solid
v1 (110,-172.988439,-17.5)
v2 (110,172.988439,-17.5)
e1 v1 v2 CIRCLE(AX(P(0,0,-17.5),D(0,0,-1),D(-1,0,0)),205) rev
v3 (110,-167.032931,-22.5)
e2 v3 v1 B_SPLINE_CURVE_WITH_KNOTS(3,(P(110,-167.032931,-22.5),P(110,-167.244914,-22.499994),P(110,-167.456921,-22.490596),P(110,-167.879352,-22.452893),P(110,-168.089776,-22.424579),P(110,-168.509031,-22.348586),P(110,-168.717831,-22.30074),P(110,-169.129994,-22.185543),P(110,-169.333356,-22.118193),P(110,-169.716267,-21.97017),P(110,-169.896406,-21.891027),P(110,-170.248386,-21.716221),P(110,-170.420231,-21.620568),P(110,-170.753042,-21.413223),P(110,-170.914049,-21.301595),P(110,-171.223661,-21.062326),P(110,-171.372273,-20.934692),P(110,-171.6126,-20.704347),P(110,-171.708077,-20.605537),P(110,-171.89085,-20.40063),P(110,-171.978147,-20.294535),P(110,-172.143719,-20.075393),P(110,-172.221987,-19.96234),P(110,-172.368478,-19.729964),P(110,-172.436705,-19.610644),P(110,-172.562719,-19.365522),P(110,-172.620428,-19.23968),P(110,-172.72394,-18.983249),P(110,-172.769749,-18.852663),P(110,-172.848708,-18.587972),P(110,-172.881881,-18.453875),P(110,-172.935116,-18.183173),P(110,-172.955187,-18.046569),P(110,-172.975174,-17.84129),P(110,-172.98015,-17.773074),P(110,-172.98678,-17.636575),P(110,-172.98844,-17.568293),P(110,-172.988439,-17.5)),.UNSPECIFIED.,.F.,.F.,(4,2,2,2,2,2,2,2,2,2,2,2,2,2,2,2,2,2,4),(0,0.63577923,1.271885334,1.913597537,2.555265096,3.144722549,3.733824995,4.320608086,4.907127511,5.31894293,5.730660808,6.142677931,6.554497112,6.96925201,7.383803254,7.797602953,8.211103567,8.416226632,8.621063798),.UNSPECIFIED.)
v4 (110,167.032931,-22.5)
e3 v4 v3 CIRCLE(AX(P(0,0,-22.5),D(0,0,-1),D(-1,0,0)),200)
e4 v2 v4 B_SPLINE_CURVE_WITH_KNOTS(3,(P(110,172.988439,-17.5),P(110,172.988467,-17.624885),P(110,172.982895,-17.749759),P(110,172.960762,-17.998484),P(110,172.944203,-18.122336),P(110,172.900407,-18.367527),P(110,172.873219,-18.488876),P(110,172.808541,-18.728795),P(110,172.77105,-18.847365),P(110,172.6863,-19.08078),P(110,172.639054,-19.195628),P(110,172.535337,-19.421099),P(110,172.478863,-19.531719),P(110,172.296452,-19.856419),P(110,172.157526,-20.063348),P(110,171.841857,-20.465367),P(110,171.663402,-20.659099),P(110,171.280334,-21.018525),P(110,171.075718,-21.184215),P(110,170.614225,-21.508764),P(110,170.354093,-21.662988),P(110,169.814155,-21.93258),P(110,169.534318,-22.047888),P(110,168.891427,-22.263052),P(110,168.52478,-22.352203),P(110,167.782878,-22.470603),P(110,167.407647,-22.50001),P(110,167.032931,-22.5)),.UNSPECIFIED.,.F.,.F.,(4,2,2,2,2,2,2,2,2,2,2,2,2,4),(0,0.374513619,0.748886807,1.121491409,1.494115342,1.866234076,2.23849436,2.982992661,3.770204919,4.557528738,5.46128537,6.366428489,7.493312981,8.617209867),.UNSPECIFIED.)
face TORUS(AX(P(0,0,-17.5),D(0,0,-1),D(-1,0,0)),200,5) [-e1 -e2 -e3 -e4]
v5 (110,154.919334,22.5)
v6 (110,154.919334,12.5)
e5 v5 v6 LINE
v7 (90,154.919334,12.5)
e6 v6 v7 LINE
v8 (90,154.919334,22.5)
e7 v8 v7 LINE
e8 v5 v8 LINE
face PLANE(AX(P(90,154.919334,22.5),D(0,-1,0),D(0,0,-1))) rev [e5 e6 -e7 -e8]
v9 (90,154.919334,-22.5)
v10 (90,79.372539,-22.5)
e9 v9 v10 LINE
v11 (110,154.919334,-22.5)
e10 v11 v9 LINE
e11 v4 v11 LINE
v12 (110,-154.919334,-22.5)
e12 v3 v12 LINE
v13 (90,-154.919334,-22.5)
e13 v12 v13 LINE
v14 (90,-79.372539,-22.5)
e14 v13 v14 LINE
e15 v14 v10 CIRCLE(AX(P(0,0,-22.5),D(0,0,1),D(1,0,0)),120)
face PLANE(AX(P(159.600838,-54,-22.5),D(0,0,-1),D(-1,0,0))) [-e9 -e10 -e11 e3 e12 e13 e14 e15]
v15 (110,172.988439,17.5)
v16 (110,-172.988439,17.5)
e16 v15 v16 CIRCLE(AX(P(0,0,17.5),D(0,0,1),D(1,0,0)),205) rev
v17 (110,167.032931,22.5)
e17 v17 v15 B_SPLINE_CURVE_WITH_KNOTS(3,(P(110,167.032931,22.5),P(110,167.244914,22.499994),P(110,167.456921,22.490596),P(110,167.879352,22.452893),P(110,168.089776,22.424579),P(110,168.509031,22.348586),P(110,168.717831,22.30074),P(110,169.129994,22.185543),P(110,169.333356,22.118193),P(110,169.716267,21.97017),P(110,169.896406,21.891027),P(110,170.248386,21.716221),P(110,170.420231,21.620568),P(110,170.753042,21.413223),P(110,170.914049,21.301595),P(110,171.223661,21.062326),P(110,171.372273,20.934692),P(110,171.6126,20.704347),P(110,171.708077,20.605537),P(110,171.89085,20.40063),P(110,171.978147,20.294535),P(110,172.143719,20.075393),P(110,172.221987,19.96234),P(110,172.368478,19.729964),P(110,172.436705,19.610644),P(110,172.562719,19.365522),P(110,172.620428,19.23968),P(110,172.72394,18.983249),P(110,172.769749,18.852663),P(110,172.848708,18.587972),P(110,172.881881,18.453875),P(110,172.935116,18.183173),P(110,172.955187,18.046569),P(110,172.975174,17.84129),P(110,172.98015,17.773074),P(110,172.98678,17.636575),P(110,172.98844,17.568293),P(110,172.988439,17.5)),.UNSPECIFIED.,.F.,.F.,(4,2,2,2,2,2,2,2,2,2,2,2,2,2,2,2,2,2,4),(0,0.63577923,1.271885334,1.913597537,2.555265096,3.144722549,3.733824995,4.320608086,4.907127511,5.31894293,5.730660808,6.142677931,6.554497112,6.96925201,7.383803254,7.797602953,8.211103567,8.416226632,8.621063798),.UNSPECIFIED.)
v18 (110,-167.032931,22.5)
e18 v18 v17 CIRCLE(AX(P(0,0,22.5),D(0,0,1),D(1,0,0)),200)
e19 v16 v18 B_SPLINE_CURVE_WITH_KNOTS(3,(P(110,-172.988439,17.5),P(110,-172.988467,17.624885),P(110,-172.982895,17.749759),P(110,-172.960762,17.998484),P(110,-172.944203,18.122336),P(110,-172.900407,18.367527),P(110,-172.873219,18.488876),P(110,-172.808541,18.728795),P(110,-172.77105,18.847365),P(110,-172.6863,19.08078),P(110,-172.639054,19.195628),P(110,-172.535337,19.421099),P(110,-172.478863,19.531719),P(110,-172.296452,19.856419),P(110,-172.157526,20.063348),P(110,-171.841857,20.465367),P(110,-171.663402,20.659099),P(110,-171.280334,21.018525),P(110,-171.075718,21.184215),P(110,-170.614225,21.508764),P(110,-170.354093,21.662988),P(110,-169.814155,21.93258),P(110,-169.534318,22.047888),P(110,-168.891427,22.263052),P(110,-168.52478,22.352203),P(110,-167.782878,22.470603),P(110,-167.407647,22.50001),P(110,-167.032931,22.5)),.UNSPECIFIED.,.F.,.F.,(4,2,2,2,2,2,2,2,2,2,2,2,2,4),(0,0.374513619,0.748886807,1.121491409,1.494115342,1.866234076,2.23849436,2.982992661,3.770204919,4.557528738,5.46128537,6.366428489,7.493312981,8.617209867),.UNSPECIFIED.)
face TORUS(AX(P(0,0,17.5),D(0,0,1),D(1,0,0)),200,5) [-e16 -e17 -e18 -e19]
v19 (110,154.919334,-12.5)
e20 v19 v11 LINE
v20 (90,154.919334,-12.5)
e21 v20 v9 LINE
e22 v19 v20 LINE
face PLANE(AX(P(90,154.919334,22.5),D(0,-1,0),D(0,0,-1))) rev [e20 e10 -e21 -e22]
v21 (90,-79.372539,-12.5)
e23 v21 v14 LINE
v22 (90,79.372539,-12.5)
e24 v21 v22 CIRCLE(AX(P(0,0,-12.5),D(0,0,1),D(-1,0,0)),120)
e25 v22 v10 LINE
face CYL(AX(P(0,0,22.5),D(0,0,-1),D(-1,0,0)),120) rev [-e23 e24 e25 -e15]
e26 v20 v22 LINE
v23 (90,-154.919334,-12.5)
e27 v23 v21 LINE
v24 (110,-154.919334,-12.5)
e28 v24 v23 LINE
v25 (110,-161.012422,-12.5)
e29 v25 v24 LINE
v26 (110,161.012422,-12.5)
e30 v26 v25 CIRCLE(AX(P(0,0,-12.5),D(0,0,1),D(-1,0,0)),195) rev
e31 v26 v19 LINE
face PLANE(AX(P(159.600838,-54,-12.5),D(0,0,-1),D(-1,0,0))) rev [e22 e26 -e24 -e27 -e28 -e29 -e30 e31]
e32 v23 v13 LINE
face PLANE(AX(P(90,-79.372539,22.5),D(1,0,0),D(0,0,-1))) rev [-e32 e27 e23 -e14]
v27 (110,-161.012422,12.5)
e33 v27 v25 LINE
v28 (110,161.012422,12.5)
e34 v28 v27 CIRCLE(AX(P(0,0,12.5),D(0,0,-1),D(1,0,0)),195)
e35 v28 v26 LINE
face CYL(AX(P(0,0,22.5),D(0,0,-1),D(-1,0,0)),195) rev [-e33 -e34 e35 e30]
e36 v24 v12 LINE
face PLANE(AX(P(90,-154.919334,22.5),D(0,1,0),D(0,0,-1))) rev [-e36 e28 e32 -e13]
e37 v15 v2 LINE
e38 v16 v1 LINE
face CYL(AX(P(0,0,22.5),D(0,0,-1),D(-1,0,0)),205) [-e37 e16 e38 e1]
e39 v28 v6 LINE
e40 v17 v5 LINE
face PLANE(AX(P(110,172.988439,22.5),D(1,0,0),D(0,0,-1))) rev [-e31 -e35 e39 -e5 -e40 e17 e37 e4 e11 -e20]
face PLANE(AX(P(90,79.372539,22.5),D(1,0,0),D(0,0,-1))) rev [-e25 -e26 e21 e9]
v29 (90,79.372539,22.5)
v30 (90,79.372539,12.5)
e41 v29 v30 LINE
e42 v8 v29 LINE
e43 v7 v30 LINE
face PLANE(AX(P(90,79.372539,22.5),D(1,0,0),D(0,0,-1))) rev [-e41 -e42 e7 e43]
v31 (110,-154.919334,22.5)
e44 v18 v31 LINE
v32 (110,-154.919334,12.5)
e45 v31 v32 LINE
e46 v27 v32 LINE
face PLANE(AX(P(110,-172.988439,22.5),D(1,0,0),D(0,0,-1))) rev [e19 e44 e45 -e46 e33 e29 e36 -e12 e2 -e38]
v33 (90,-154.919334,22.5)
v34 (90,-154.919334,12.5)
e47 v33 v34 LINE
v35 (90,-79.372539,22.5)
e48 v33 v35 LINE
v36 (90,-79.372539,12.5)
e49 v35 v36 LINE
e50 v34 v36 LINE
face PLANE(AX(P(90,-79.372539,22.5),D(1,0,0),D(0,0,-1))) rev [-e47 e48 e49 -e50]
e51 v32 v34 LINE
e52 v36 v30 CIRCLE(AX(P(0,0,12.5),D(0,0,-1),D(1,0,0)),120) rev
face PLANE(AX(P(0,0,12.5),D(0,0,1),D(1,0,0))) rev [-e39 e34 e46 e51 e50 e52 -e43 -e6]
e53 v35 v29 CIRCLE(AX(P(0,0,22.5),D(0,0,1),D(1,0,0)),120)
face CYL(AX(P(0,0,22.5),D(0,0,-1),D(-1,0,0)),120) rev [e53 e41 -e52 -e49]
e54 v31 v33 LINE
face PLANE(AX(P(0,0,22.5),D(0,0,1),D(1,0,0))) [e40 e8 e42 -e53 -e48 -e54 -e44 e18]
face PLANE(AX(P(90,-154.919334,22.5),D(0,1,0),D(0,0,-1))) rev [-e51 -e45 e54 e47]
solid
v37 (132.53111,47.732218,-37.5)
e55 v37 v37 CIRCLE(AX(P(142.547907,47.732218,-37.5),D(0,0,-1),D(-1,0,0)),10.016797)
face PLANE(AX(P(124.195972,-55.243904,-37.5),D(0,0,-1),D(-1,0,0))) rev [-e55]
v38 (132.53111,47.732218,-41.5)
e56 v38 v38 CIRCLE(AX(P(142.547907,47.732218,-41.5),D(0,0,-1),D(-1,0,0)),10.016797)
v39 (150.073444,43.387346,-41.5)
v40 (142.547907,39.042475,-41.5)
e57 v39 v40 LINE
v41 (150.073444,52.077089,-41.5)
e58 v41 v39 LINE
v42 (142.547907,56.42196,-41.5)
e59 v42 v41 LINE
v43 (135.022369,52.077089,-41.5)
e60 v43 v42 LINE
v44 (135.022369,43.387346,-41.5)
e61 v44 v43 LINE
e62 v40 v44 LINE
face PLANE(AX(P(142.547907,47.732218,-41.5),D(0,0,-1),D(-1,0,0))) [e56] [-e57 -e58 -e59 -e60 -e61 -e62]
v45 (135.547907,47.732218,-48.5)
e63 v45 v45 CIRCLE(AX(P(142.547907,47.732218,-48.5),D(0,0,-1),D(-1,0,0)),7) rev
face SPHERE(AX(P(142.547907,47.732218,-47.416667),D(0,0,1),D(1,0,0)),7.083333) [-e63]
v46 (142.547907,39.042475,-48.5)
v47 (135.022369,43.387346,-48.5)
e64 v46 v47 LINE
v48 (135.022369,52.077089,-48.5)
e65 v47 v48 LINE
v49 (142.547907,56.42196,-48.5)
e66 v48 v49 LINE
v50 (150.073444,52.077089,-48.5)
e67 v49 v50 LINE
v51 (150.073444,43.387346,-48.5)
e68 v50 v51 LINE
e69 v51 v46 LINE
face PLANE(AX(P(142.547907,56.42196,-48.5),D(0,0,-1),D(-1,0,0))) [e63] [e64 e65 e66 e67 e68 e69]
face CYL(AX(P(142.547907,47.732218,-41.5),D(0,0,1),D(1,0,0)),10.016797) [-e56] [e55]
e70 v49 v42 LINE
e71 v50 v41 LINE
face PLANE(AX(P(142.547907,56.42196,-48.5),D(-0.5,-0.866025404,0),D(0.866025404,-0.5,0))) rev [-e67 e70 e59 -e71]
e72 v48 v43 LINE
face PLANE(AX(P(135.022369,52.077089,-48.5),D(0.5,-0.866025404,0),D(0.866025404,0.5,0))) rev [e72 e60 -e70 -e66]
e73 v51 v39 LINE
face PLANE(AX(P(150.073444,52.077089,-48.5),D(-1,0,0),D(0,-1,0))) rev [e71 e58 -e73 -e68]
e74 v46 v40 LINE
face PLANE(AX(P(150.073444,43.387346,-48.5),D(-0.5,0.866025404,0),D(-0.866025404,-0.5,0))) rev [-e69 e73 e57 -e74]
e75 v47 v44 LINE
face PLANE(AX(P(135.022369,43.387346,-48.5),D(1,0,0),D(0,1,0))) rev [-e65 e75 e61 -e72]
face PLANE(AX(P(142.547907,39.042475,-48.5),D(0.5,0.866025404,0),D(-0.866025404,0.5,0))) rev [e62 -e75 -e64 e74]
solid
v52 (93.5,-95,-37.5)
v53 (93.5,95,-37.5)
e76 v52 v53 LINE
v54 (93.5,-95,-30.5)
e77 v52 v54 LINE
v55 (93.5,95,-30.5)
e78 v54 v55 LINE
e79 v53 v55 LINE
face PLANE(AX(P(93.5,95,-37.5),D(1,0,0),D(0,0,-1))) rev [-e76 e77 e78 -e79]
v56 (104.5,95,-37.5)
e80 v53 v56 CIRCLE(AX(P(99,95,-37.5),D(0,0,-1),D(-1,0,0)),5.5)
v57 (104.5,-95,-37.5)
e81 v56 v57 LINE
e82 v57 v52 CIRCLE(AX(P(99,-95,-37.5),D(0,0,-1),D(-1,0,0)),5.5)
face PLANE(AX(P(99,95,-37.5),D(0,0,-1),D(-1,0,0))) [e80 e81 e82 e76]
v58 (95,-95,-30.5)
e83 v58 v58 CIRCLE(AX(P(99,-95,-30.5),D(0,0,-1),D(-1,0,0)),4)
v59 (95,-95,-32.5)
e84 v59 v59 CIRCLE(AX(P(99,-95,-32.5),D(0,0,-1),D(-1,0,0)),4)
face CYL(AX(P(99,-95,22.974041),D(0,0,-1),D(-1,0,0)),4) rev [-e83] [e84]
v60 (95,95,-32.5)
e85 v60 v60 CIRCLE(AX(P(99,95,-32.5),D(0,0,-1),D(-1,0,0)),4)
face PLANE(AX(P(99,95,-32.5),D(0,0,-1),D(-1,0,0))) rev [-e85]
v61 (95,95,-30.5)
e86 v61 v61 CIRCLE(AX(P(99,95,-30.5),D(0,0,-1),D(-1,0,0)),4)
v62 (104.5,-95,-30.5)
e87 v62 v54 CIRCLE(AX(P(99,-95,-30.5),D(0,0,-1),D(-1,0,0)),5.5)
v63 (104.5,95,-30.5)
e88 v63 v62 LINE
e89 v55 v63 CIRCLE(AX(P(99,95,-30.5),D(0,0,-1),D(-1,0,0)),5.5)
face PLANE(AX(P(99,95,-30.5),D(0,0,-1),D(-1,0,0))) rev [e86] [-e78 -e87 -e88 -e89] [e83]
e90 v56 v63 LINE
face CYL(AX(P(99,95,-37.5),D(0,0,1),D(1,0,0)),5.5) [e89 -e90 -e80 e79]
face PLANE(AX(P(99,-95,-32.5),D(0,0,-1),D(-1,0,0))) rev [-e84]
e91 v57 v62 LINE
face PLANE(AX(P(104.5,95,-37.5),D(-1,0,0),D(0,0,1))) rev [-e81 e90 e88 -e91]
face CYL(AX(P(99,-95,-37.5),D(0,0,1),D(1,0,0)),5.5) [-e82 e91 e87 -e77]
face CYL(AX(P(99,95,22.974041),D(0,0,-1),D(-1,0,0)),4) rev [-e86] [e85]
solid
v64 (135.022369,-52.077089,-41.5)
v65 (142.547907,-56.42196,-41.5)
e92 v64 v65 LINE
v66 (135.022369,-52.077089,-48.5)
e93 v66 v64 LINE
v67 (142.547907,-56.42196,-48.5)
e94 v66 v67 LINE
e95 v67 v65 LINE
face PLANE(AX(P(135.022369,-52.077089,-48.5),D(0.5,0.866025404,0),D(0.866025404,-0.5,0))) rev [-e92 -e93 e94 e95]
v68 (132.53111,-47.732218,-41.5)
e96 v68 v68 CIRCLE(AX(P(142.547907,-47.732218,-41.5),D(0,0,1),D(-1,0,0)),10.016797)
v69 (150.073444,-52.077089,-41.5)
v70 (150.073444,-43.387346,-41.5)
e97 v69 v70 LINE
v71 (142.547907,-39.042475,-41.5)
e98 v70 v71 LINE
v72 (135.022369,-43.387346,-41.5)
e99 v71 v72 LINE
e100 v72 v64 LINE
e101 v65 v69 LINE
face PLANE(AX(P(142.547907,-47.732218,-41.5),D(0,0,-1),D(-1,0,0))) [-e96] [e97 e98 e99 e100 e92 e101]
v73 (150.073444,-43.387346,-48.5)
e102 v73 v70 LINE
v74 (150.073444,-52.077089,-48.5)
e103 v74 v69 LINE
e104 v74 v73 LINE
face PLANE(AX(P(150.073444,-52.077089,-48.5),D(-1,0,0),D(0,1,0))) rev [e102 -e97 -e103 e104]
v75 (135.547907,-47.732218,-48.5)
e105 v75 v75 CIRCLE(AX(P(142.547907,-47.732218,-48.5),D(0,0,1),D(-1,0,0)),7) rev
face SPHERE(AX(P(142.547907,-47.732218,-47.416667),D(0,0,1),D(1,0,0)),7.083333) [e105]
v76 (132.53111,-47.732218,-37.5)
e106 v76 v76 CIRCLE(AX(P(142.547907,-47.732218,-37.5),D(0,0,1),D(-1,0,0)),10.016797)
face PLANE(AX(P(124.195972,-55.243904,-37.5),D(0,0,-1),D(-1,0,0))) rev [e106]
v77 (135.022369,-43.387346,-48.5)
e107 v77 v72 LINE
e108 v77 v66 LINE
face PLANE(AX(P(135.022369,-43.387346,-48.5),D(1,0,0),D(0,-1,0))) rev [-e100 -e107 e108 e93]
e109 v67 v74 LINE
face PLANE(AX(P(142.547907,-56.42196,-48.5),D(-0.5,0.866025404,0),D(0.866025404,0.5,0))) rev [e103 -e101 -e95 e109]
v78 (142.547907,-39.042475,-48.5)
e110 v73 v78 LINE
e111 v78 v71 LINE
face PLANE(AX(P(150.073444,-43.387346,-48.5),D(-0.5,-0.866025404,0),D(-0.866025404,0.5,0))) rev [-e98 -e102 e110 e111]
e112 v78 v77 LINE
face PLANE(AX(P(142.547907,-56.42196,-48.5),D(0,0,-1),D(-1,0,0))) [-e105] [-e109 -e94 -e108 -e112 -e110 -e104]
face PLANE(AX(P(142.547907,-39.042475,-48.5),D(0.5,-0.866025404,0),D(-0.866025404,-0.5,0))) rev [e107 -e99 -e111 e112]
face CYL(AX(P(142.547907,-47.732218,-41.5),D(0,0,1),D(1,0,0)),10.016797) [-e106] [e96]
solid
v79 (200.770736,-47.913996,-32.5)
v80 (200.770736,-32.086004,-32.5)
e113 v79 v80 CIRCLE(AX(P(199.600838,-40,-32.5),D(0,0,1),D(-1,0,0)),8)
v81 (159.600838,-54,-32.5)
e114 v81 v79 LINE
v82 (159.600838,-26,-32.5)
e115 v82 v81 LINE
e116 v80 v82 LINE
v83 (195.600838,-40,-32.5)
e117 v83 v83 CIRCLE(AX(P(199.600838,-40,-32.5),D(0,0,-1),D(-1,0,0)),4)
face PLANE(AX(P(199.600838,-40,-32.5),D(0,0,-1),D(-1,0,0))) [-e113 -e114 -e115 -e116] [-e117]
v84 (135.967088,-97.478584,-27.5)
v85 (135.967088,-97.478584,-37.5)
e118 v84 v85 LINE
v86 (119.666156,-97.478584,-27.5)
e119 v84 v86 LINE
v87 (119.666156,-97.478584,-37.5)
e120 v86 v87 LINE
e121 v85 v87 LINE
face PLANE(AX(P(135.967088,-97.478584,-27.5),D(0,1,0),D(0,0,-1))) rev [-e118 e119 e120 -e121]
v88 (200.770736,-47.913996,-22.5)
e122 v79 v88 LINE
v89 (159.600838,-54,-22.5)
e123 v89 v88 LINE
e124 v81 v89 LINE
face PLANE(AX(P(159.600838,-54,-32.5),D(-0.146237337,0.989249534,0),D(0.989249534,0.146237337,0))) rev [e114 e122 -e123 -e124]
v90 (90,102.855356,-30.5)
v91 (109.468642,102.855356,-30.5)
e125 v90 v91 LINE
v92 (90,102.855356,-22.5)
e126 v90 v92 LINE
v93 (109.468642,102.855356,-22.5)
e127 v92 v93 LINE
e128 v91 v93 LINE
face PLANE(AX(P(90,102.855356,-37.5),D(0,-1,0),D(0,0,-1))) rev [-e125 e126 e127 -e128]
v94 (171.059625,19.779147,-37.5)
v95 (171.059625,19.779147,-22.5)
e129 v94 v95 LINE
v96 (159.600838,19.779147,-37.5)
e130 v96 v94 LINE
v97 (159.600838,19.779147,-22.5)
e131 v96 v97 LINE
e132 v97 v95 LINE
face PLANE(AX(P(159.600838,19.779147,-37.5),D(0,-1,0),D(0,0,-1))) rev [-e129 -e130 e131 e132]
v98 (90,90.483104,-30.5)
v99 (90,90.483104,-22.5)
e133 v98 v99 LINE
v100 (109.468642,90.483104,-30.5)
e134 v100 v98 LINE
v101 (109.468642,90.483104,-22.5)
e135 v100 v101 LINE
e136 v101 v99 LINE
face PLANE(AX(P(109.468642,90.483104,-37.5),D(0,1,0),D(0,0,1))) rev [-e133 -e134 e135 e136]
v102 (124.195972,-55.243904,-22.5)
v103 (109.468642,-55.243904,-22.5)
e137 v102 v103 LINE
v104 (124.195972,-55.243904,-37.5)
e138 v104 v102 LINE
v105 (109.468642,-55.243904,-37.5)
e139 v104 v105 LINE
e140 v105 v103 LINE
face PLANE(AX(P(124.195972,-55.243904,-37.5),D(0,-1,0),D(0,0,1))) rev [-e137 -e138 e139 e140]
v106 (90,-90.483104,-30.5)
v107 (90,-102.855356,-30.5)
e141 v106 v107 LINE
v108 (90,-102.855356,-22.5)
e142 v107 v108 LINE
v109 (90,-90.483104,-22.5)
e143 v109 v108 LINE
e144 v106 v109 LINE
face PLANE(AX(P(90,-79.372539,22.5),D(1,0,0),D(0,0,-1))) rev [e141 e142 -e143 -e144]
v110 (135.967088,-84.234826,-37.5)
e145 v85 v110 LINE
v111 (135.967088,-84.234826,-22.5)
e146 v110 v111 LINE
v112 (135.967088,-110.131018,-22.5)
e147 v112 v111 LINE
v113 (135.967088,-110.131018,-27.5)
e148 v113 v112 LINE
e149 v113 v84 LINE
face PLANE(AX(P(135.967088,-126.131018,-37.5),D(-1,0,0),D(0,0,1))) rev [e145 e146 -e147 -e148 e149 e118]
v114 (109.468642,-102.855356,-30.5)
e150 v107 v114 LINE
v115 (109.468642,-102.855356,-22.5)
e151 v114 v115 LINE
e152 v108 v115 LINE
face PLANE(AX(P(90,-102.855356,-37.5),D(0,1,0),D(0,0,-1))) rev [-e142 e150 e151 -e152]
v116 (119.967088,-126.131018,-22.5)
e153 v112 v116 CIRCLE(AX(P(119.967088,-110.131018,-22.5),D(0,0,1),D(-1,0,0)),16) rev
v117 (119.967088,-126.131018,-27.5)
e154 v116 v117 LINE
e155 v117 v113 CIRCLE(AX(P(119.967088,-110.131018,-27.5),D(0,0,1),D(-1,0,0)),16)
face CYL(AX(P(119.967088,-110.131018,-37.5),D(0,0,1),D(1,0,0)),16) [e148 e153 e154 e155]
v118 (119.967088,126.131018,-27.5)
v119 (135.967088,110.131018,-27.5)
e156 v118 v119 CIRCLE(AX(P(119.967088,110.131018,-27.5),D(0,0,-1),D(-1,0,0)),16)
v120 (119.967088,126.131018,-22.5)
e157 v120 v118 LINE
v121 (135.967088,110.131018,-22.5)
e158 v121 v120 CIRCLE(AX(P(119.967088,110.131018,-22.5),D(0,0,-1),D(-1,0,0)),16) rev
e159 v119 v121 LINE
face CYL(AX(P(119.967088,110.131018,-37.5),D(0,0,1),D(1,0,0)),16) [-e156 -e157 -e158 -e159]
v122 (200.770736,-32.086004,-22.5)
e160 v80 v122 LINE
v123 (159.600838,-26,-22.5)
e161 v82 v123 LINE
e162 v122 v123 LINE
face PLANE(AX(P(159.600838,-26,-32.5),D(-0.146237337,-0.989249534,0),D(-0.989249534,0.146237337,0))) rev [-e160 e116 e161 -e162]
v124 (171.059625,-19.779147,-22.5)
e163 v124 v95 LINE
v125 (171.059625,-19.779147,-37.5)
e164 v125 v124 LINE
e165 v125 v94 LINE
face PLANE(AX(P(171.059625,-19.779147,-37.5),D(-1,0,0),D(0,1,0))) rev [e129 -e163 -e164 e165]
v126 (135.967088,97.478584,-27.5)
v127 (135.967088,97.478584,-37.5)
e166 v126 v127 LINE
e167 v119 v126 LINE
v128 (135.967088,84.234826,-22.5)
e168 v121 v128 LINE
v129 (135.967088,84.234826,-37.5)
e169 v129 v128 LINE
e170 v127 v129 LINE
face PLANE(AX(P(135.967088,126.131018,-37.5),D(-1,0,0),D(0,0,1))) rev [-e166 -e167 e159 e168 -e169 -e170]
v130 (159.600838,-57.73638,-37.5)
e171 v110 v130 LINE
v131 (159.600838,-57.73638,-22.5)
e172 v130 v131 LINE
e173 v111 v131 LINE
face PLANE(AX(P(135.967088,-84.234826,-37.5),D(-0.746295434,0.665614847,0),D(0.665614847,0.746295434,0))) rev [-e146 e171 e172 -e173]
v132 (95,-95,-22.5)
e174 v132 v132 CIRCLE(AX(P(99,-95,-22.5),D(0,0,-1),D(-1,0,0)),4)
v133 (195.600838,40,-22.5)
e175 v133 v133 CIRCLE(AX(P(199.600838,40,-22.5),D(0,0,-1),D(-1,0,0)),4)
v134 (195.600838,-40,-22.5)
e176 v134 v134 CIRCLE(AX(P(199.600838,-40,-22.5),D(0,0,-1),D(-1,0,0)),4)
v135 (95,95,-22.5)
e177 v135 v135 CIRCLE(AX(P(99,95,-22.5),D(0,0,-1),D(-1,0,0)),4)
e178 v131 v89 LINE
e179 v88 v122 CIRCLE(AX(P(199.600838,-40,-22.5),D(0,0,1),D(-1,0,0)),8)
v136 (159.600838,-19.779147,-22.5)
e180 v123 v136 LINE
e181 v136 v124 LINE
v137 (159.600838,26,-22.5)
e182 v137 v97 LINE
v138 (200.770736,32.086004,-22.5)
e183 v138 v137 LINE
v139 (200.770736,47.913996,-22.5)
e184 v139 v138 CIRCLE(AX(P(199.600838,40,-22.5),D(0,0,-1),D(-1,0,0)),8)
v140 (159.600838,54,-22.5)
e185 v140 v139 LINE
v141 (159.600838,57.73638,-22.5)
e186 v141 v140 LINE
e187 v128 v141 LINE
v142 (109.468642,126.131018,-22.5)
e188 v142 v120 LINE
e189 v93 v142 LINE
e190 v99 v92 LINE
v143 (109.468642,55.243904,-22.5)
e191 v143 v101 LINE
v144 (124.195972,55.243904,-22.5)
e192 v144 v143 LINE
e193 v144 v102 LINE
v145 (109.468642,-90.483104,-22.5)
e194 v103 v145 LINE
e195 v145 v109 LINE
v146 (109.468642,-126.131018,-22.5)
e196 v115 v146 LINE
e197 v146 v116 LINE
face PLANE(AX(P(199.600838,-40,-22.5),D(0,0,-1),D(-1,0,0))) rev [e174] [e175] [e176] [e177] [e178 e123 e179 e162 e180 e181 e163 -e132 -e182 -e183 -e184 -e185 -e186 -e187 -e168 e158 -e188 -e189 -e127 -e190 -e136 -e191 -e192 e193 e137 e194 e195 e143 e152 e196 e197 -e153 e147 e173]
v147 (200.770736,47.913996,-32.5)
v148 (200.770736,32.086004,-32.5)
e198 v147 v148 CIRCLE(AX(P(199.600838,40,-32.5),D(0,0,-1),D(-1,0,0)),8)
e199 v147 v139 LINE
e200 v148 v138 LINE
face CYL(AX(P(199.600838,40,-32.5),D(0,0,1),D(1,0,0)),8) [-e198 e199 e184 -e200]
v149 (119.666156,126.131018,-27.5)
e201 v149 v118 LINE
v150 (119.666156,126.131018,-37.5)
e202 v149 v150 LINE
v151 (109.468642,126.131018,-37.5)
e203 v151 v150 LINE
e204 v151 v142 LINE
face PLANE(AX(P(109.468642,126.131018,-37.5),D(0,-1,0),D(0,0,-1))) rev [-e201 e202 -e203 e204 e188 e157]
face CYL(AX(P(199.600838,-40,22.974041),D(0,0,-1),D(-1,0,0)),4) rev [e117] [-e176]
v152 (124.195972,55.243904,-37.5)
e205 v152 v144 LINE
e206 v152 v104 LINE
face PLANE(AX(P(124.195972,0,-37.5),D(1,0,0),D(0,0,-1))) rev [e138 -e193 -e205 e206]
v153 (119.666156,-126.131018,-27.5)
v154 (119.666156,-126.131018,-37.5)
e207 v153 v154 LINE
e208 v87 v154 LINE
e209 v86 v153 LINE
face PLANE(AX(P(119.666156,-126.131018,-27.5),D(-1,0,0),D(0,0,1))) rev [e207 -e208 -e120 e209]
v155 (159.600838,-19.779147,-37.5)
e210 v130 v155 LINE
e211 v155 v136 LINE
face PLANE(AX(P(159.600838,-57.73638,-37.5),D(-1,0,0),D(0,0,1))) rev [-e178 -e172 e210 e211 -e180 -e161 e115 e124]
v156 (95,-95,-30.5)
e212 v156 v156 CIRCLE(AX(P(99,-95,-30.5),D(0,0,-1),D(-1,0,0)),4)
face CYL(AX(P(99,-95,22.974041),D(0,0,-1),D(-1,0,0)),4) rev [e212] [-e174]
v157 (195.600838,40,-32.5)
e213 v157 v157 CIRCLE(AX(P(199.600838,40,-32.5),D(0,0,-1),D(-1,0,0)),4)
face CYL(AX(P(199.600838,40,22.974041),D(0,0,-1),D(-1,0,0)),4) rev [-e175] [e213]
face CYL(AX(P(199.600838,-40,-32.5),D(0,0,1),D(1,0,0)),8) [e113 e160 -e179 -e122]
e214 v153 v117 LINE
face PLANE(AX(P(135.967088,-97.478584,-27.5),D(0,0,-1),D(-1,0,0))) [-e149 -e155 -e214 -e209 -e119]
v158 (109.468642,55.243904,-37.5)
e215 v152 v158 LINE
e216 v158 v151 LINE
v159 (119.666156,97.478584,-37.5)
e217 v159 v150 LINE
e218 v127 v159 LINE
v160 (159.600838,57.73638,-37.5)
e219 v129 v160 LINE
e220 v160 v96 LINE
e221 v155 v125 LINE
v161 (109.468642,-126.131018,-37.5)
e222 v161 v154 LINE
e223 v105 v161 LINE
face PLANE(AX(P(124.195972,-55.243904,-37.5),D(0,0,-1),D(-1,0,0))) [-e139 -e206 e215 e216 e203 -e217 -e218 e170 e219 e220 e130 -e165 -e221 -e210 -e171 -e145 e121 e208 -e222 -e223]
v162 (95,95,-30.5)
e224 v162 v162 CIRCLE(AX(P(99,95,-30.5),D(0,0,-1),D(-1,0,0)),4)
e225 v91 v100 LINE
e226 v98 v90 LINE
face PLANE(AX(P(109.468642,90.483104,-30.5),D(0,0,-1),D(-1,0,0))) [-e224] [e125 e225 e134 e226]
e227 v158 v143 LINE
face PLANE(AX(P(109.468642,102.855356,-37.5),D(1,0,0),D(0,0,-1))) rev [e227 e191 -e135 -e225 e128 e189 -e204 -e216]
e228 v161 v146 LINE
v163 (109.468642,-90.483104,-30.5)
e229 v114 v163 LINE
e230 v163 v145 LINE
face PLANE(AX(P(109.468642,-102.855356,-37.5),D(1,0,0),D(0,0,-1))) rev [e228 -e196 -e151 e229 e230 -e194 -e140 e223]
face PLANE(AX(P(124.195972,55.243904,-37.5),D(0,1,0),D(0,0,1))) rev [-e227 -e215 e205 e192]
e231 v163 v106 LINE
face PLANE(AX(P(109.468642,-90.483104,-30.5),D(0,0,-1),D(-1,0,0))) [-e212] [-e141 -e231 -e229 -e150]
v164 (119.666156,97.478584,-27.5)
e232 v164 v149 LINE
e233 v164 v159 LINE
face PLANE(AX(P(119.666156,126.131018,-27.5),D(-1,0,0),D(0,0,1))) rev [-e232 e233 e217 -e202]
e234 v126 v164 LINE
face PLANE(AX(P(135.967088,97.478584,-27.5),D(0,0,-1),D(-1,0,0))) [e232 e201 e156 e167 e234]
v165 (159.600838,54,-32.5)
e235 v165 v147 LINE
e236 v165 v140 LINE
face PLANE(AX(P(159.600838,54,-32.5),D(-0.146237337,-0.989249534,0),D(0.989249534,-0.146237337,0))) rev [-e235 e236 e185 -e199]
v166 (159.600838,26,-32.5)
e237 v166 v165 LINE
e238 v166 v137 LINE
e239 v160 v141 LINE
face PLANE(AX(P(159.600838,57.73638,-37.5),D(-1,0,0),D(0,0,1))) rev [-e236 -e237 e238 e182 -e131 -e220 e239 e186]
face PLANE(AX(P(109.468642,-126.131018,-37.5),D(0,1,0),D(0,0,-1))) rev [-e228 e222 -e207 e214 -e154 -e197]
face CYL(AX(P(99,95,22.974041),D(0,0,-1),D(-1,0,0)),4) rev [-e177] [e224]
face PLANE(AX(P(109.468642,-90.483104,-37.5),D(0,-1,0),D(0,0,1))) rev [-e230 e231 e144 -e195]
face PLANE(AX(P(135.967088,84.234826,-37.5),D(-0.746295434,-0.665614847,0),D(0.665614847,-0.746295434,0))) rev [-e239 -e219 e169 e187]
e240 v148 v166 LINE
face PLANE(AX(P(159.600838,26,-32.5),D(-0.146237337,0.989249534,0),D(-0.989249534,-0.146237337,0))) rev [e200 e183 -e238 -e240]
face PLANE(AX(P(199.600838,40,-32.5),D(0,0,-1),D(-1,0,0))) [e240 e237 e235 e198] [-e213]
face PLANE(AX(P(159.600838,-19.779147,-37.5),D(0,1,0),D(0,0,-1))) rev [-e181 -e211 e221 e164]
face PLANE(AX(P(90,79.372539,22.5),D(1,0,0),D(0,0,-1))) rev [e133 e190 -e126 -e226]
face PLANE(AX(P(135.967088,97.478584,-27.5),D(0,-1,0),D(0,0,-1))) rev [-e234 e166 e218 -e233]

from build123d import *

# Parameters (mm, degrees)
BOSS_EXTRUDE1_DEPTH  = 22.5
BOSS_EXTRUDE11_DEPTH = 15.000000000000007
BOSS_EXTRUDE12_DEPTH = 10.000000000000002
SKETCH17_W           = 16.30093206343537
SKETCH17_H           = 28.65243434652365
CUT_EXTRUDE3_DEPTH   = 10.000000000000002
SKETCH18_R           = 10.016796709236138
BOSS_EXTRUDE13_DEPTH = 4
BOSS_EXTRUDE14_DEPTH = 7
SKETCH20_W           = 19.468642499915788
SKETCH20_H           = 12.372252056489486
CUT_EXTRUDE4_DEPTH   = 7
SHELL1_T             = -10
FILLET2_R            = 16
BOSS_EXTRUDE16_DEPTH = 7
FILLET5_R            = 5
SKETCH27_R           = 3.9999999999999933
SKETCH27_R_2         = 4.000000000000007
CUT_EXTRUDE6_DEPTH   = 276.7682139586702
SPLIT2_START         = -37.5
SPLIT2_DEPTH         = 15
SPLIT2_START_2       = -32.5
SPLIT2_2_OUTLINE_R   = 4
SPLIT2_2_DEPTH       = 10
SPLIT2_START_3       = -27.5
SPLIT2_3_OUTLINE_W   = 19.4686425
SPLIT2_3_OUTLINE_H   = 12.372252056000008
SPLIT2_3_OUTLINE_R   = 4
SPLIT2_3_DEPTH       = 5
SPLIT2_START_4       = -30.5
SPLIT2_4_OUTLINE_W   = 19.4686425
SPLIT2_4_OUTLINE_H   = 12.372252056000008
SPLIT2_4_OUTLINE_R   = 4
SPLIT2_4_DEPTH       = 3
SPLIT2_5_OUTLINE_R   = 4
SPLIT2_5_DEPTH       = 15
SPLIT2_START_5       = -55
SPLIT2_6_OUTLINE_R   = 10.016796709
SPLIT2_6_DEPTH       = 17.5
SPLIT2_START_6       = -48.5
SPLIT2_7_DEPTH       = 11
SPLIT2_START_7       = -41.5
SPLIT2_8_OUTLINE_R   = 10.016796709
SPLIT2_8_DEPTH       = 4


with BuildPart() as part:
    # Sketch2 → Boss-Extrude1 (new, symmetric)
    with BuildSketch(Plane.XY):
        with BuildLine():
            Line((120, 0), (205.00000000000003, 0))
            ThreePointArc((205.00000000000003, 0), (179.6872282606641, 98.67877177995278), (109.99999999999999, 172.98843892006195))
            Line((109.99999999999999, 172.98843892006195), (109.99999999999999, 154.91933384829673))
            Line((109.99999999999999, 154.91933384829673), (90, 154.91933384829673))
            Line((90, 154.91933384829673), (90, 79.37253933193772))
            ThreePointArc((90, 79.37253933193772), (112.24972160321823, 42.426406871192846), (120, 0))
        make_face()
    extrude(amount=BOSS_EXTRUDE1_DEPTH, both=True)

    # Sketch15 → Boss-Extrude11 (add)
    with BuildSketch(Plane(origin=(0, 0, -22.5), x_dir=(-1, 0, 0), z_dir=(0, 0, -1))):
        Polygon((-90, 102.85535609908183), (-109.46864249991577, 102.85535609908183), (-109.46864249991577, 126.1310181234055), (-135.96708849683807, 126.1310181234055), (-135.96708849683807, 84.23482647962292), (-159.60083762922824, 57.736380482700625), (-159.60083762922824, 19.77914702764976), (-171.0596250873568, 19.77914702764976), (-171.05962508735678, -1.73e-15), (-124.19597171575583, 0), (-124.19597171575583, 55.24390413047252), (-109.46864249991577, 55.24390413047252), (-109.46864249991577, 90.48310404259234), (-90, 90.48310404259234), align=None)
    extrude(amount=BOSS_EXTRUDE11_DEPTH)

    # Sketch16 → Boss-Extrude12 (add)
    with BuildSketch(Plane(origin=(0, 0, -22.5), x_dir=(-1, 0, 0), z_dir=(0, 0, -1))):
        with BuildLine():
            Line((-159.60083762922824, 26.000000000000004), (-200.770736325474, 32.08600372501209))
            ThreePointArc((-200.770736325474, 32.08600372501209), (-207.60083762922824, 39.99999999999999), (-200.770736325474, 47.913996274987895))
            Line((-200.770736325474, 47.913996274987895), (-159.60083762922824, 54))
            Line((-159.60083762922824, 54), (-159.60083762922824, 26.000000000000004))
        make_face()
    extrude(amount=BOSS_EXTRUDE12_DEPTH)

    # Sketch17 → Cut-Extrude3 (cut)
    with BuildSketch(Plane(origin=(0, 0, -37.50000000000001), x_dir=(-1, 0, 0), z_dir=(0, 0, -1))):
        with Locations((-127.81662246512039, 111.80480095014369)):
            Rectangle(SKETCH17_W, SKETCH17_H)
    extrude(amount=-CUT_EXTRUDE3_DEPTH, mode=Mode.SUBTRACT)

    # Sketch18 → Boss-Extrude13 (add)
    with BuildSketch(Plane(origin=(0, 0, -37.50000000000001), x_dir=(-1, 0, 0), z_dir=(0, 0, -1))):
        with Locations((-142.54790687329097, 47.73221762561834)):
            Circle(SKETCH18_R)
    extrude(amount=BOSS_EXTRUDE13_DEPTH)

    # Sketch19 → Boss-Extrude14 (add)
    with BuildSketch(Plane(origin=(0, 0, -41.50000000000001), x_dir=(-1, 0, 0), z_dir=(0, 0, -1))):
        Polygon((-142.54790687329097, 56.421959954505496), (-150.0734444824482, 52.0770887900619), (-150.07344448244817, 43.38734646117473), (-142.5479068732909, 39.04247529673119), (-135.0223692641337, 43.387346461174836), (-135.0223692641338, 52.07708879006201), align=None)
    extrude(amount=BOSS_EXTRUDE14_DEPTH)

    # Dome2: read off the stored shape, not the designer's step
    # Dome2 outline → Dome2 (revolve)
    with BuildSketch(Plane(origin=(142.547906873, 47.732217626, 0), x_dir=(1, 0, 0), z_dir=(0, -1, 0))):
        with BuildLine():
            Line((0, -48.499999993), (0, -54.5))
            ThreePointArc((0, -54.5), (4.609772231, -52.794734264), (7.000000001, -48.499999993))
            Line((7.000000001, -48.499999993), (0, -48.499999993))
        make_face()
    revolve(axis=Axis((142.547906873, 47.732217626, 0), (0, 0, 1)))

    # Sketch20 → Cut-Extrude4 (cut)
    with BuildSketch(Plane(origin=(0, 0, -37.50000000000001), x_dir=(-1, 0, 0), z_dir=(0, 0, -1))):
        with Locations((-99.7343212499579, 96.66923007083709)):
            Rectangle(SKETCH20_W, SKETCH20_H)
    extrude(amount=-CUT_EXTRUDE4_DEPTH, mode=Mode.SUBTRACT)


with BuildPart() as body_2:
    # Split1: read off the stored shape, not the designer's step
    # Split1: the piece on the far side of the plane
    add(part.part)
    split(bisect_by=Plane.XY.offset(-22.5), keep=Keep.BOTTOM)

    # Fillet2
    fillet2_edges = [body_2.edges().sort_by_distance(p)[0] for p in [
        (135.96708849683807, 126.1310181234055, -25.000000000000004),
    ]]
    fillet(fillet2_edges, radius=FILLET2_R)


with BuildPart() as part_1:
    add(part.part)

    # Split1
    split(bisect_by=Plane.XY.offset(-22.5), keep=Keep.TOP)

    # Shell1
    shell1_openings = [part_1.faces().sort_by_distance(p)[0] for p in [
        (90, 117.14593659, 0),
        (112.249721603, 42.426406871, 0),
        (162.5, 0, 0),
        (110, 163.953886384, 0),
        (100, 154.919333848, 0),
    ]]
    offset(amount=SHELL1_T, openings=shell1_openings)


with BuildPart() as body_3:
    # Mirror2: mirrored copy
    add(part_1.part.mirror(Plane(origin=(120, 0, 22.5), x_dir=(0, 0, 1), z_dir=(0, 1, 0))))

    # Combine2: union part
    add(part_1.part)

    # Fillet5
    fillet5_edges = [body_3.edges().sort_by_distance(p)[0] for p in [
        (205, -3.55e-15, -22.5),
        (205, -3.55e-15, 22.5),
    ]]
    fillet(fillet5_edges, radius=FILLET5_R)


with BuildPart() as body_4:
    # Mirror2 2: mirrored copy
    add(body_2.part.mirror(Plane(origin=(120, 0, 22.5), x_dir=(0, 0, 1), z_dir=(0, 1, 0))))

    # Combine1: union body 2
    add(body_2.part)


with BuildPart() as body_4_2:
    # Sketch23 → Boss-Extrude16 (new body)
    with BuildSketch(Plane(origin=(0, 0, -30.500000000000007), x_dir=(-1, 0, 0), z_dir=(0, 0, -1))):
        with BuildLine():
            Line((-93.49999999999997, 95), (-93.49999999999997, -95))
            ThreePointArc((-93.49999999999997, -95), (-98.99999999999996, -100.50000000000001), (-104.49999999999997, -95))
            Line((-104.49999999999997, -95), (-104.49999999999997, 95))
            ThreePointArc((-104.49999999999997, 95), (-98.99999999999996, 100.49999999999999), (-93.49999999999997, 95))
        make_face()
    extrude(amount=BOSS_EXTRUDE16_DEPTH)


with BuildPart() as cut_extrude6_tool:
    # Sketch27 → Cut-Extrude6 (new, through all)
    with BuildSketch(Plane(origin=(0, 0, -32.5), x_dir=(-1, 0, 0), z_dir=(0, 0, -1))):
        with Locations((-199.60083762922824, 39.99999999999999)):
            Circle(SKETCH27_R)
        with Locations((-199.60083762922824, -39.99999999999999)):
            Circle(SKETCH27_R)
        with Locations((-98.99999999999996, 95)):
            Circle(SKETCH27_R_2)
        with Locations((-98.99999999999996, -95)):
            Circle(SKETCH27_R_2)
    extrude(amount=-CUT_EXTRUDE6_DEPTH)


with BuildPart() as body_4_1:
    add(body_4.part)

    # Cut-Extrude6: cut by cut_extrude6_tool
    add(cut_extrude6_tool.part, mode=Mode.SUBTRACT)

    # Split2 5 outline → Split2 5 (cut)
    with BuildSketch(Plane.XY.offset(SPLIT2_START)):
        with BuildLine():
            Line((109.4686425, -55.24390413), (109.4686425, -90.483104043))
            Line((109.4686425, -90.483104043), (90, -90.483104043))
            Line((90, -90.483104043), (90, -102.855356099))
            Line((90, -102.855356099), (109.4686425, -102.855356099))
            Line((109.4686425, -102.855356099), (109.4686425, -126.131018123))
            Line((109.4686425, -126.131018123), (119.967088497, -126.131018123))
            ThreePointArc((119.967088497, -126.131018123), (131.280796996, -121.444726622), (135.967088497, -110.131018123))
            Line((135.967088497, -110.131018123), (135.967088497, -84.23482648))
            Line((135.967088497, -84.23482648), (159.600837629, -57.736380483))
            Line((159.600837629, -57.736380483), (159.600837629, -54))
            Line((159.600837629, -54), (200.770736325, -47.913996275))
            ThreePointArc((200.770736325, -47.913996275), (207.600837629, -40), (200.770736325, -32.086003725))
            Line((200.770736325, -32.086003725), (159.600837629, -26))
            Line((159.600837629, -26), (159.600837629, -19.779147028))
            Line((159.600837629, -19.779147028), (171.059625087, -19.779147028))
            Line((171.059625087, -19.779147028), (171.059625087, 19.779147028))
            Line((171.059625087, 19.779147028), (159.600837629, 19.779147028))
            Line((159.600837629, 19.779147028), (159.600837629, 26))
            Line((159.600837629, 26), (200.770736325, 32.086003725))
            ThreePointArc((200.770736325, 32.086003725), (207.600837629, 40), (200.770736325, 47.913996275))
            Line((200.770736325, 47.913996275), (159.600837629, 54))
            Line((159.600837629, 54), (159.600837629, 57.736380483))
            Line((159.600837629, 57.736380483), (135.967088497, 84.23482648))
            Line((135.967088497, 84.23482648), (135.967088497, 110.131018123))
            ThreePointArc((135.967088497, 110.131018123), (131.280796996, 121.444726622), (119.967088497, 126.131018123))
            Line((119.967088497, 126.131018123), (109.4686425, 126.131018123))
            Line((109.4686425, 126.131018123), (109.4686425, 102.855356099))
            Line((109.4686425, 102.855356099), (90, 102.855356099))
            Line((90, 102.855356099), (90, 90.483104043))
            Line((90, 90.483104043), (109.4686425, 90.483104043))
            Line((109.4686425, 90.483104043), (109.4686425, 55.24390413))
            Line((109.4686425, 55.24390413), (124.195971716, 55.24390413))
            Line((124.195971716, 55.24390413), (124.195971716, -55.24390413))
            Line((124.195971716, -55.24390413), (109.4686425, -55.24390413))
        make_face()
        with Locations((99, -95)):
            Circle(SPLIT2_5_OUTLINE_R, mode=Mode.SUBTRACT)
        with Locations((99, 95)):
            Circle(SPLIT2_5_OUTLINE_R, mode=Mode.SUBTRACT)
        with Locations((199.600837629, 40)):
            Circle(SPLIT2_5_OUTLINE_R, mode=Mode.SUBTRACT)
        with Locations((199.600837629, -40)):
            Circle(SPLIT2_5_OUTLINE_R, mode=Mode.SUBTRACT)
    extrude(amount=SPLIT2_5_DEPTH, mode=Mode.SUBTRACT)

    # Split2 6 outline → Split2 6 (cut)
    with BuildSketch(Plane.XY.offset(SPLIT2_START_5)):
        with Locations((142.547906873, 47.732217626)):
            Circle(SPLIT2_6_OUTLINE_R)
    extrude(amount=SPLIT2_6_DEPTH, mode=Mode.SUBTRACT)


with BuildPart() as body_4_2_1:
    add(body_4_2.part)

    # Cut-Extrude6: cut by cut_extrude6_tool
    add(cut_extrude6_tool.part, mode=Mode.SUBTRACT)


with BuildPart() as body_4_3:
    # Split2: read off the stored shape, not the designer's step
    # Split2 outline → Split2 (new body)
    with BuildSketch(Plane.XY.offset(SPLIT2_START)):
        Polygon((109.4686425, -55.24390413), (109.4686425, -126.131018123), (119.666156433, -126.131018123), (119.666156433, -97.478583777), (135.967088497, -97.478583777), (135.967088497, -84.23482648), (159.600837629, -57.736380483), (159.600837629, -19.779147028), (171.059625087, -19.779147028), (171.059625087, 19.779147028), (159.600837629, 19.779147028), (159.600837629, 57.736380483), (135.967088497, 84.23482648), (135.967088497, 97.478583777), (119.666156433, 97.478583777), (119.666156433, 126.131018123), (109.4686425, 126.131018123), (109.4686425, 55.24390413), (124.195971716, 55.24390413), (124.195971716, -55.24390413), align=None)
    extrude(amount=SPLIT2_DEPTH)

    # Split2 2 outline → Split2 2 (add)
    # profile 1 of 2: a face of its own
    with BuildSketch(Plane.XY.offset(SPLIT2_START_2)):
        with BuildLine():
            Line((159.600837629, -26), (159.600837629, -54))
            Line((159.600837629, -54), (200.770736325, -47.913996275))
            ThreePointArc((200.770736325, -47.913996275), (207.600837629, -40), (200.770736325, -32.086003725))
            Line((200.770736325, -32.086003725), (159.600837629, -26))
        make_face()
        with Locations((199.600837629, -40)):
            Circle(SPLIT2_2_OUTLINE_R, mode=Mode.SUBTRACT)
    # profile 2 of 2: a face of its own
    with BuildSketch(Plane.XY.offset(SPLIT2_START_2)):
        with BuildLine():
            Line((159.600837629, 54), (159.600837629, 26))
            Line((159.600837629, 26), (200.770736325, 32.086003725))
            ThreePointArc((200.770736325, 32.086003725), (207.600837629, 40), (200.770736325, 47.913996275))
            Line((200.770736325, 47.913996275), (159.600837629, 54))
        make_face()
        with Locations((199.600837629, 40)):
            Circle(SPLIT2_2_OUTLINE_R, mode=Mode.SUBTRACT)
    extrude(amount=SPLIT2_2_DEPTH)

    # Split2 3 outline → Split2 3 (add)
    # profile 1 of 4: a face of its own
    with BuildSketch(Plane.XY.offset(SPLIT2_START_3)):
        with Locations((99.73432125, -96.669230071)):
            Rectangle(SPLIT2_3_OUTLINE_W, SPLIT2_3_OUTLINE_H)
        with Locations((99, -95)):
            Circle(SPLIT2_3_OUTLINE_R, mode=Mode.SUBTRACT)
    # profile 2 of 4: a face of its own
    with BuildSketch(Plane.XY.offset(SPLIT2_START_3)):
        with BuildLine():
            Line((119.666156433, -97.478583777), (119.666156433, -126.131018123))
            Line((119.666156433, -126.131018123), (119.967088497, -126.131018123))
            ThreePointArc((119.967088497, -126.131018123), (131.280796996, -121.444726622), (135.967088497, -110.131018123))
            Line((135.967088497, -110.131018123), (135.967088497, -97.478583777))
            Line((135.967088497, -97.478583777), (119.666156433, -97.478583777))
        make_face()
    # profile 3 of 4: a face of its own
    with BuildSketch(Plane.XY.offset(SPLIT2_START_3)):
        with Locations((99.73432125, 96.669230071)):
            Rectangle(SPLIT2_3_OUTLINE_W, SPLIT2_3_OUTLINE_H)
        with Locations((99, 95)):
            Circle(SPLIT2_3_OUTLINE_R, mode=Mode.SUBTRACT)
    # profile 4 of 4: a face of its own
    with BuildSketch(Plane.XY.offset(SPLIT2_START_3)):
        with BuildLine():
            Line((119.967088497, 126.131018123), (119.666156433, 126.131018123))
            Line((119.666156433, 126.131018123), (119.666156433, 97.478583777))
            Line((119.666156433, 97.478583777), (135.967088497, 97.478583777))
            Line((135.967088497, 97.478583777), (135.967088497, 110.131018123))
            ThreePointArc((135.967088497, 110.131018123), (131.280796996, 121.444726622), (119.967088497, 126.131018123))
        make_face()
    extrude(amount=SPLIT2_3_DEPTH)

    # Split2 4 outline → Split2 4 (add)
    # profile 1 of 2: a face of its own
    with BuildSketch(Plane.XY.offset(SPLIT2_START_4)):
        with Locations((99.73432125, -96.669230071)):
            Rectangle(SPLIT2_4_OUTLINE_W, SPLIT2_4_OUTLINE_H)
        with Locations((99, -95)):
            Circle(SPLIT2_4_OUTLINE_R, mode=Mode.SUBTRACT)
    # profile 2 of 2: a face of its own
    with BuildSketch(Plane.XY.offset(SPLIT2_START_4)):
        with Locations((99.73432125, 96.669230071)):
            Rectangle(SPLIT2_4_OUTLINE_W, SPLIT2_4_OUTLINE_H)
        with Locations((99, 95)):
            Circle(SPLIT2_4_OUTLINE_R, mode=Mode.SUBTRACT)
    extrude(amount=SPLIT2_4_DEPTH)


with BuildPart() as body_5:
    # Split2 7 outline → Split2 7 (new body)
    with BuildSketch(Plane.XY.offset(SPLIT2_START_6)):
        Polygon((150.073444482, 43.387346461), (150.073444482, 52.07708879), (142.547906873, 56.421959955), (135.022369264, 52.07708879), (135.022369264, 43.387346461), (142.547906873, 39.042475297), align=None)
    extrude(amount=SPLIT2_7_DEPTH)

    # Split2 8 outline → Split2 8 (add)
    with BuildSketch(Plane.XY.offset(SPLIT2_START_7)):
        with Locations((142.547906873, 47.732217626)):
            Circle(SPLIT2_8_OUTLINE_R)
        Polygon((142.547906873, 56.421959955), (150.073444482, 52.07708879), (150.073444482, 43.387346461), (142.547906873, 39.042475297), (135.022369264, 43.387346461), (135.022369264, 52.07708879), align=None, mode=Mode.SUBTRACT)
    extrude(amount=SPLIT2_8_DEPTH)

    # Split2 9 outline → Split2 9 (revolve)
    with BuildSketch(Plane(origin=(142.547906873, 47.732217626, 0), x_dir=(1, 0, 0), z_dir=(0, -1, 0))):
        with BuildLine():
            Line((0, -48.499999993), (0, -54.5))
            ThreePointArc((0, -54.5), (4.609772231, -52.794734264), (7.000000001, -48.499999993))
            Line((7.000000001, -48.499999993), (0, -48.499999993))
        make_face()
    revolve(axis=Axis((142.547906873, 47.732217626, 0), (0, 0, 1)))


solid = Compound([body_3.part, body_4_1.part, body_4_2_1.part, body_4_3.part, body_5.part])
